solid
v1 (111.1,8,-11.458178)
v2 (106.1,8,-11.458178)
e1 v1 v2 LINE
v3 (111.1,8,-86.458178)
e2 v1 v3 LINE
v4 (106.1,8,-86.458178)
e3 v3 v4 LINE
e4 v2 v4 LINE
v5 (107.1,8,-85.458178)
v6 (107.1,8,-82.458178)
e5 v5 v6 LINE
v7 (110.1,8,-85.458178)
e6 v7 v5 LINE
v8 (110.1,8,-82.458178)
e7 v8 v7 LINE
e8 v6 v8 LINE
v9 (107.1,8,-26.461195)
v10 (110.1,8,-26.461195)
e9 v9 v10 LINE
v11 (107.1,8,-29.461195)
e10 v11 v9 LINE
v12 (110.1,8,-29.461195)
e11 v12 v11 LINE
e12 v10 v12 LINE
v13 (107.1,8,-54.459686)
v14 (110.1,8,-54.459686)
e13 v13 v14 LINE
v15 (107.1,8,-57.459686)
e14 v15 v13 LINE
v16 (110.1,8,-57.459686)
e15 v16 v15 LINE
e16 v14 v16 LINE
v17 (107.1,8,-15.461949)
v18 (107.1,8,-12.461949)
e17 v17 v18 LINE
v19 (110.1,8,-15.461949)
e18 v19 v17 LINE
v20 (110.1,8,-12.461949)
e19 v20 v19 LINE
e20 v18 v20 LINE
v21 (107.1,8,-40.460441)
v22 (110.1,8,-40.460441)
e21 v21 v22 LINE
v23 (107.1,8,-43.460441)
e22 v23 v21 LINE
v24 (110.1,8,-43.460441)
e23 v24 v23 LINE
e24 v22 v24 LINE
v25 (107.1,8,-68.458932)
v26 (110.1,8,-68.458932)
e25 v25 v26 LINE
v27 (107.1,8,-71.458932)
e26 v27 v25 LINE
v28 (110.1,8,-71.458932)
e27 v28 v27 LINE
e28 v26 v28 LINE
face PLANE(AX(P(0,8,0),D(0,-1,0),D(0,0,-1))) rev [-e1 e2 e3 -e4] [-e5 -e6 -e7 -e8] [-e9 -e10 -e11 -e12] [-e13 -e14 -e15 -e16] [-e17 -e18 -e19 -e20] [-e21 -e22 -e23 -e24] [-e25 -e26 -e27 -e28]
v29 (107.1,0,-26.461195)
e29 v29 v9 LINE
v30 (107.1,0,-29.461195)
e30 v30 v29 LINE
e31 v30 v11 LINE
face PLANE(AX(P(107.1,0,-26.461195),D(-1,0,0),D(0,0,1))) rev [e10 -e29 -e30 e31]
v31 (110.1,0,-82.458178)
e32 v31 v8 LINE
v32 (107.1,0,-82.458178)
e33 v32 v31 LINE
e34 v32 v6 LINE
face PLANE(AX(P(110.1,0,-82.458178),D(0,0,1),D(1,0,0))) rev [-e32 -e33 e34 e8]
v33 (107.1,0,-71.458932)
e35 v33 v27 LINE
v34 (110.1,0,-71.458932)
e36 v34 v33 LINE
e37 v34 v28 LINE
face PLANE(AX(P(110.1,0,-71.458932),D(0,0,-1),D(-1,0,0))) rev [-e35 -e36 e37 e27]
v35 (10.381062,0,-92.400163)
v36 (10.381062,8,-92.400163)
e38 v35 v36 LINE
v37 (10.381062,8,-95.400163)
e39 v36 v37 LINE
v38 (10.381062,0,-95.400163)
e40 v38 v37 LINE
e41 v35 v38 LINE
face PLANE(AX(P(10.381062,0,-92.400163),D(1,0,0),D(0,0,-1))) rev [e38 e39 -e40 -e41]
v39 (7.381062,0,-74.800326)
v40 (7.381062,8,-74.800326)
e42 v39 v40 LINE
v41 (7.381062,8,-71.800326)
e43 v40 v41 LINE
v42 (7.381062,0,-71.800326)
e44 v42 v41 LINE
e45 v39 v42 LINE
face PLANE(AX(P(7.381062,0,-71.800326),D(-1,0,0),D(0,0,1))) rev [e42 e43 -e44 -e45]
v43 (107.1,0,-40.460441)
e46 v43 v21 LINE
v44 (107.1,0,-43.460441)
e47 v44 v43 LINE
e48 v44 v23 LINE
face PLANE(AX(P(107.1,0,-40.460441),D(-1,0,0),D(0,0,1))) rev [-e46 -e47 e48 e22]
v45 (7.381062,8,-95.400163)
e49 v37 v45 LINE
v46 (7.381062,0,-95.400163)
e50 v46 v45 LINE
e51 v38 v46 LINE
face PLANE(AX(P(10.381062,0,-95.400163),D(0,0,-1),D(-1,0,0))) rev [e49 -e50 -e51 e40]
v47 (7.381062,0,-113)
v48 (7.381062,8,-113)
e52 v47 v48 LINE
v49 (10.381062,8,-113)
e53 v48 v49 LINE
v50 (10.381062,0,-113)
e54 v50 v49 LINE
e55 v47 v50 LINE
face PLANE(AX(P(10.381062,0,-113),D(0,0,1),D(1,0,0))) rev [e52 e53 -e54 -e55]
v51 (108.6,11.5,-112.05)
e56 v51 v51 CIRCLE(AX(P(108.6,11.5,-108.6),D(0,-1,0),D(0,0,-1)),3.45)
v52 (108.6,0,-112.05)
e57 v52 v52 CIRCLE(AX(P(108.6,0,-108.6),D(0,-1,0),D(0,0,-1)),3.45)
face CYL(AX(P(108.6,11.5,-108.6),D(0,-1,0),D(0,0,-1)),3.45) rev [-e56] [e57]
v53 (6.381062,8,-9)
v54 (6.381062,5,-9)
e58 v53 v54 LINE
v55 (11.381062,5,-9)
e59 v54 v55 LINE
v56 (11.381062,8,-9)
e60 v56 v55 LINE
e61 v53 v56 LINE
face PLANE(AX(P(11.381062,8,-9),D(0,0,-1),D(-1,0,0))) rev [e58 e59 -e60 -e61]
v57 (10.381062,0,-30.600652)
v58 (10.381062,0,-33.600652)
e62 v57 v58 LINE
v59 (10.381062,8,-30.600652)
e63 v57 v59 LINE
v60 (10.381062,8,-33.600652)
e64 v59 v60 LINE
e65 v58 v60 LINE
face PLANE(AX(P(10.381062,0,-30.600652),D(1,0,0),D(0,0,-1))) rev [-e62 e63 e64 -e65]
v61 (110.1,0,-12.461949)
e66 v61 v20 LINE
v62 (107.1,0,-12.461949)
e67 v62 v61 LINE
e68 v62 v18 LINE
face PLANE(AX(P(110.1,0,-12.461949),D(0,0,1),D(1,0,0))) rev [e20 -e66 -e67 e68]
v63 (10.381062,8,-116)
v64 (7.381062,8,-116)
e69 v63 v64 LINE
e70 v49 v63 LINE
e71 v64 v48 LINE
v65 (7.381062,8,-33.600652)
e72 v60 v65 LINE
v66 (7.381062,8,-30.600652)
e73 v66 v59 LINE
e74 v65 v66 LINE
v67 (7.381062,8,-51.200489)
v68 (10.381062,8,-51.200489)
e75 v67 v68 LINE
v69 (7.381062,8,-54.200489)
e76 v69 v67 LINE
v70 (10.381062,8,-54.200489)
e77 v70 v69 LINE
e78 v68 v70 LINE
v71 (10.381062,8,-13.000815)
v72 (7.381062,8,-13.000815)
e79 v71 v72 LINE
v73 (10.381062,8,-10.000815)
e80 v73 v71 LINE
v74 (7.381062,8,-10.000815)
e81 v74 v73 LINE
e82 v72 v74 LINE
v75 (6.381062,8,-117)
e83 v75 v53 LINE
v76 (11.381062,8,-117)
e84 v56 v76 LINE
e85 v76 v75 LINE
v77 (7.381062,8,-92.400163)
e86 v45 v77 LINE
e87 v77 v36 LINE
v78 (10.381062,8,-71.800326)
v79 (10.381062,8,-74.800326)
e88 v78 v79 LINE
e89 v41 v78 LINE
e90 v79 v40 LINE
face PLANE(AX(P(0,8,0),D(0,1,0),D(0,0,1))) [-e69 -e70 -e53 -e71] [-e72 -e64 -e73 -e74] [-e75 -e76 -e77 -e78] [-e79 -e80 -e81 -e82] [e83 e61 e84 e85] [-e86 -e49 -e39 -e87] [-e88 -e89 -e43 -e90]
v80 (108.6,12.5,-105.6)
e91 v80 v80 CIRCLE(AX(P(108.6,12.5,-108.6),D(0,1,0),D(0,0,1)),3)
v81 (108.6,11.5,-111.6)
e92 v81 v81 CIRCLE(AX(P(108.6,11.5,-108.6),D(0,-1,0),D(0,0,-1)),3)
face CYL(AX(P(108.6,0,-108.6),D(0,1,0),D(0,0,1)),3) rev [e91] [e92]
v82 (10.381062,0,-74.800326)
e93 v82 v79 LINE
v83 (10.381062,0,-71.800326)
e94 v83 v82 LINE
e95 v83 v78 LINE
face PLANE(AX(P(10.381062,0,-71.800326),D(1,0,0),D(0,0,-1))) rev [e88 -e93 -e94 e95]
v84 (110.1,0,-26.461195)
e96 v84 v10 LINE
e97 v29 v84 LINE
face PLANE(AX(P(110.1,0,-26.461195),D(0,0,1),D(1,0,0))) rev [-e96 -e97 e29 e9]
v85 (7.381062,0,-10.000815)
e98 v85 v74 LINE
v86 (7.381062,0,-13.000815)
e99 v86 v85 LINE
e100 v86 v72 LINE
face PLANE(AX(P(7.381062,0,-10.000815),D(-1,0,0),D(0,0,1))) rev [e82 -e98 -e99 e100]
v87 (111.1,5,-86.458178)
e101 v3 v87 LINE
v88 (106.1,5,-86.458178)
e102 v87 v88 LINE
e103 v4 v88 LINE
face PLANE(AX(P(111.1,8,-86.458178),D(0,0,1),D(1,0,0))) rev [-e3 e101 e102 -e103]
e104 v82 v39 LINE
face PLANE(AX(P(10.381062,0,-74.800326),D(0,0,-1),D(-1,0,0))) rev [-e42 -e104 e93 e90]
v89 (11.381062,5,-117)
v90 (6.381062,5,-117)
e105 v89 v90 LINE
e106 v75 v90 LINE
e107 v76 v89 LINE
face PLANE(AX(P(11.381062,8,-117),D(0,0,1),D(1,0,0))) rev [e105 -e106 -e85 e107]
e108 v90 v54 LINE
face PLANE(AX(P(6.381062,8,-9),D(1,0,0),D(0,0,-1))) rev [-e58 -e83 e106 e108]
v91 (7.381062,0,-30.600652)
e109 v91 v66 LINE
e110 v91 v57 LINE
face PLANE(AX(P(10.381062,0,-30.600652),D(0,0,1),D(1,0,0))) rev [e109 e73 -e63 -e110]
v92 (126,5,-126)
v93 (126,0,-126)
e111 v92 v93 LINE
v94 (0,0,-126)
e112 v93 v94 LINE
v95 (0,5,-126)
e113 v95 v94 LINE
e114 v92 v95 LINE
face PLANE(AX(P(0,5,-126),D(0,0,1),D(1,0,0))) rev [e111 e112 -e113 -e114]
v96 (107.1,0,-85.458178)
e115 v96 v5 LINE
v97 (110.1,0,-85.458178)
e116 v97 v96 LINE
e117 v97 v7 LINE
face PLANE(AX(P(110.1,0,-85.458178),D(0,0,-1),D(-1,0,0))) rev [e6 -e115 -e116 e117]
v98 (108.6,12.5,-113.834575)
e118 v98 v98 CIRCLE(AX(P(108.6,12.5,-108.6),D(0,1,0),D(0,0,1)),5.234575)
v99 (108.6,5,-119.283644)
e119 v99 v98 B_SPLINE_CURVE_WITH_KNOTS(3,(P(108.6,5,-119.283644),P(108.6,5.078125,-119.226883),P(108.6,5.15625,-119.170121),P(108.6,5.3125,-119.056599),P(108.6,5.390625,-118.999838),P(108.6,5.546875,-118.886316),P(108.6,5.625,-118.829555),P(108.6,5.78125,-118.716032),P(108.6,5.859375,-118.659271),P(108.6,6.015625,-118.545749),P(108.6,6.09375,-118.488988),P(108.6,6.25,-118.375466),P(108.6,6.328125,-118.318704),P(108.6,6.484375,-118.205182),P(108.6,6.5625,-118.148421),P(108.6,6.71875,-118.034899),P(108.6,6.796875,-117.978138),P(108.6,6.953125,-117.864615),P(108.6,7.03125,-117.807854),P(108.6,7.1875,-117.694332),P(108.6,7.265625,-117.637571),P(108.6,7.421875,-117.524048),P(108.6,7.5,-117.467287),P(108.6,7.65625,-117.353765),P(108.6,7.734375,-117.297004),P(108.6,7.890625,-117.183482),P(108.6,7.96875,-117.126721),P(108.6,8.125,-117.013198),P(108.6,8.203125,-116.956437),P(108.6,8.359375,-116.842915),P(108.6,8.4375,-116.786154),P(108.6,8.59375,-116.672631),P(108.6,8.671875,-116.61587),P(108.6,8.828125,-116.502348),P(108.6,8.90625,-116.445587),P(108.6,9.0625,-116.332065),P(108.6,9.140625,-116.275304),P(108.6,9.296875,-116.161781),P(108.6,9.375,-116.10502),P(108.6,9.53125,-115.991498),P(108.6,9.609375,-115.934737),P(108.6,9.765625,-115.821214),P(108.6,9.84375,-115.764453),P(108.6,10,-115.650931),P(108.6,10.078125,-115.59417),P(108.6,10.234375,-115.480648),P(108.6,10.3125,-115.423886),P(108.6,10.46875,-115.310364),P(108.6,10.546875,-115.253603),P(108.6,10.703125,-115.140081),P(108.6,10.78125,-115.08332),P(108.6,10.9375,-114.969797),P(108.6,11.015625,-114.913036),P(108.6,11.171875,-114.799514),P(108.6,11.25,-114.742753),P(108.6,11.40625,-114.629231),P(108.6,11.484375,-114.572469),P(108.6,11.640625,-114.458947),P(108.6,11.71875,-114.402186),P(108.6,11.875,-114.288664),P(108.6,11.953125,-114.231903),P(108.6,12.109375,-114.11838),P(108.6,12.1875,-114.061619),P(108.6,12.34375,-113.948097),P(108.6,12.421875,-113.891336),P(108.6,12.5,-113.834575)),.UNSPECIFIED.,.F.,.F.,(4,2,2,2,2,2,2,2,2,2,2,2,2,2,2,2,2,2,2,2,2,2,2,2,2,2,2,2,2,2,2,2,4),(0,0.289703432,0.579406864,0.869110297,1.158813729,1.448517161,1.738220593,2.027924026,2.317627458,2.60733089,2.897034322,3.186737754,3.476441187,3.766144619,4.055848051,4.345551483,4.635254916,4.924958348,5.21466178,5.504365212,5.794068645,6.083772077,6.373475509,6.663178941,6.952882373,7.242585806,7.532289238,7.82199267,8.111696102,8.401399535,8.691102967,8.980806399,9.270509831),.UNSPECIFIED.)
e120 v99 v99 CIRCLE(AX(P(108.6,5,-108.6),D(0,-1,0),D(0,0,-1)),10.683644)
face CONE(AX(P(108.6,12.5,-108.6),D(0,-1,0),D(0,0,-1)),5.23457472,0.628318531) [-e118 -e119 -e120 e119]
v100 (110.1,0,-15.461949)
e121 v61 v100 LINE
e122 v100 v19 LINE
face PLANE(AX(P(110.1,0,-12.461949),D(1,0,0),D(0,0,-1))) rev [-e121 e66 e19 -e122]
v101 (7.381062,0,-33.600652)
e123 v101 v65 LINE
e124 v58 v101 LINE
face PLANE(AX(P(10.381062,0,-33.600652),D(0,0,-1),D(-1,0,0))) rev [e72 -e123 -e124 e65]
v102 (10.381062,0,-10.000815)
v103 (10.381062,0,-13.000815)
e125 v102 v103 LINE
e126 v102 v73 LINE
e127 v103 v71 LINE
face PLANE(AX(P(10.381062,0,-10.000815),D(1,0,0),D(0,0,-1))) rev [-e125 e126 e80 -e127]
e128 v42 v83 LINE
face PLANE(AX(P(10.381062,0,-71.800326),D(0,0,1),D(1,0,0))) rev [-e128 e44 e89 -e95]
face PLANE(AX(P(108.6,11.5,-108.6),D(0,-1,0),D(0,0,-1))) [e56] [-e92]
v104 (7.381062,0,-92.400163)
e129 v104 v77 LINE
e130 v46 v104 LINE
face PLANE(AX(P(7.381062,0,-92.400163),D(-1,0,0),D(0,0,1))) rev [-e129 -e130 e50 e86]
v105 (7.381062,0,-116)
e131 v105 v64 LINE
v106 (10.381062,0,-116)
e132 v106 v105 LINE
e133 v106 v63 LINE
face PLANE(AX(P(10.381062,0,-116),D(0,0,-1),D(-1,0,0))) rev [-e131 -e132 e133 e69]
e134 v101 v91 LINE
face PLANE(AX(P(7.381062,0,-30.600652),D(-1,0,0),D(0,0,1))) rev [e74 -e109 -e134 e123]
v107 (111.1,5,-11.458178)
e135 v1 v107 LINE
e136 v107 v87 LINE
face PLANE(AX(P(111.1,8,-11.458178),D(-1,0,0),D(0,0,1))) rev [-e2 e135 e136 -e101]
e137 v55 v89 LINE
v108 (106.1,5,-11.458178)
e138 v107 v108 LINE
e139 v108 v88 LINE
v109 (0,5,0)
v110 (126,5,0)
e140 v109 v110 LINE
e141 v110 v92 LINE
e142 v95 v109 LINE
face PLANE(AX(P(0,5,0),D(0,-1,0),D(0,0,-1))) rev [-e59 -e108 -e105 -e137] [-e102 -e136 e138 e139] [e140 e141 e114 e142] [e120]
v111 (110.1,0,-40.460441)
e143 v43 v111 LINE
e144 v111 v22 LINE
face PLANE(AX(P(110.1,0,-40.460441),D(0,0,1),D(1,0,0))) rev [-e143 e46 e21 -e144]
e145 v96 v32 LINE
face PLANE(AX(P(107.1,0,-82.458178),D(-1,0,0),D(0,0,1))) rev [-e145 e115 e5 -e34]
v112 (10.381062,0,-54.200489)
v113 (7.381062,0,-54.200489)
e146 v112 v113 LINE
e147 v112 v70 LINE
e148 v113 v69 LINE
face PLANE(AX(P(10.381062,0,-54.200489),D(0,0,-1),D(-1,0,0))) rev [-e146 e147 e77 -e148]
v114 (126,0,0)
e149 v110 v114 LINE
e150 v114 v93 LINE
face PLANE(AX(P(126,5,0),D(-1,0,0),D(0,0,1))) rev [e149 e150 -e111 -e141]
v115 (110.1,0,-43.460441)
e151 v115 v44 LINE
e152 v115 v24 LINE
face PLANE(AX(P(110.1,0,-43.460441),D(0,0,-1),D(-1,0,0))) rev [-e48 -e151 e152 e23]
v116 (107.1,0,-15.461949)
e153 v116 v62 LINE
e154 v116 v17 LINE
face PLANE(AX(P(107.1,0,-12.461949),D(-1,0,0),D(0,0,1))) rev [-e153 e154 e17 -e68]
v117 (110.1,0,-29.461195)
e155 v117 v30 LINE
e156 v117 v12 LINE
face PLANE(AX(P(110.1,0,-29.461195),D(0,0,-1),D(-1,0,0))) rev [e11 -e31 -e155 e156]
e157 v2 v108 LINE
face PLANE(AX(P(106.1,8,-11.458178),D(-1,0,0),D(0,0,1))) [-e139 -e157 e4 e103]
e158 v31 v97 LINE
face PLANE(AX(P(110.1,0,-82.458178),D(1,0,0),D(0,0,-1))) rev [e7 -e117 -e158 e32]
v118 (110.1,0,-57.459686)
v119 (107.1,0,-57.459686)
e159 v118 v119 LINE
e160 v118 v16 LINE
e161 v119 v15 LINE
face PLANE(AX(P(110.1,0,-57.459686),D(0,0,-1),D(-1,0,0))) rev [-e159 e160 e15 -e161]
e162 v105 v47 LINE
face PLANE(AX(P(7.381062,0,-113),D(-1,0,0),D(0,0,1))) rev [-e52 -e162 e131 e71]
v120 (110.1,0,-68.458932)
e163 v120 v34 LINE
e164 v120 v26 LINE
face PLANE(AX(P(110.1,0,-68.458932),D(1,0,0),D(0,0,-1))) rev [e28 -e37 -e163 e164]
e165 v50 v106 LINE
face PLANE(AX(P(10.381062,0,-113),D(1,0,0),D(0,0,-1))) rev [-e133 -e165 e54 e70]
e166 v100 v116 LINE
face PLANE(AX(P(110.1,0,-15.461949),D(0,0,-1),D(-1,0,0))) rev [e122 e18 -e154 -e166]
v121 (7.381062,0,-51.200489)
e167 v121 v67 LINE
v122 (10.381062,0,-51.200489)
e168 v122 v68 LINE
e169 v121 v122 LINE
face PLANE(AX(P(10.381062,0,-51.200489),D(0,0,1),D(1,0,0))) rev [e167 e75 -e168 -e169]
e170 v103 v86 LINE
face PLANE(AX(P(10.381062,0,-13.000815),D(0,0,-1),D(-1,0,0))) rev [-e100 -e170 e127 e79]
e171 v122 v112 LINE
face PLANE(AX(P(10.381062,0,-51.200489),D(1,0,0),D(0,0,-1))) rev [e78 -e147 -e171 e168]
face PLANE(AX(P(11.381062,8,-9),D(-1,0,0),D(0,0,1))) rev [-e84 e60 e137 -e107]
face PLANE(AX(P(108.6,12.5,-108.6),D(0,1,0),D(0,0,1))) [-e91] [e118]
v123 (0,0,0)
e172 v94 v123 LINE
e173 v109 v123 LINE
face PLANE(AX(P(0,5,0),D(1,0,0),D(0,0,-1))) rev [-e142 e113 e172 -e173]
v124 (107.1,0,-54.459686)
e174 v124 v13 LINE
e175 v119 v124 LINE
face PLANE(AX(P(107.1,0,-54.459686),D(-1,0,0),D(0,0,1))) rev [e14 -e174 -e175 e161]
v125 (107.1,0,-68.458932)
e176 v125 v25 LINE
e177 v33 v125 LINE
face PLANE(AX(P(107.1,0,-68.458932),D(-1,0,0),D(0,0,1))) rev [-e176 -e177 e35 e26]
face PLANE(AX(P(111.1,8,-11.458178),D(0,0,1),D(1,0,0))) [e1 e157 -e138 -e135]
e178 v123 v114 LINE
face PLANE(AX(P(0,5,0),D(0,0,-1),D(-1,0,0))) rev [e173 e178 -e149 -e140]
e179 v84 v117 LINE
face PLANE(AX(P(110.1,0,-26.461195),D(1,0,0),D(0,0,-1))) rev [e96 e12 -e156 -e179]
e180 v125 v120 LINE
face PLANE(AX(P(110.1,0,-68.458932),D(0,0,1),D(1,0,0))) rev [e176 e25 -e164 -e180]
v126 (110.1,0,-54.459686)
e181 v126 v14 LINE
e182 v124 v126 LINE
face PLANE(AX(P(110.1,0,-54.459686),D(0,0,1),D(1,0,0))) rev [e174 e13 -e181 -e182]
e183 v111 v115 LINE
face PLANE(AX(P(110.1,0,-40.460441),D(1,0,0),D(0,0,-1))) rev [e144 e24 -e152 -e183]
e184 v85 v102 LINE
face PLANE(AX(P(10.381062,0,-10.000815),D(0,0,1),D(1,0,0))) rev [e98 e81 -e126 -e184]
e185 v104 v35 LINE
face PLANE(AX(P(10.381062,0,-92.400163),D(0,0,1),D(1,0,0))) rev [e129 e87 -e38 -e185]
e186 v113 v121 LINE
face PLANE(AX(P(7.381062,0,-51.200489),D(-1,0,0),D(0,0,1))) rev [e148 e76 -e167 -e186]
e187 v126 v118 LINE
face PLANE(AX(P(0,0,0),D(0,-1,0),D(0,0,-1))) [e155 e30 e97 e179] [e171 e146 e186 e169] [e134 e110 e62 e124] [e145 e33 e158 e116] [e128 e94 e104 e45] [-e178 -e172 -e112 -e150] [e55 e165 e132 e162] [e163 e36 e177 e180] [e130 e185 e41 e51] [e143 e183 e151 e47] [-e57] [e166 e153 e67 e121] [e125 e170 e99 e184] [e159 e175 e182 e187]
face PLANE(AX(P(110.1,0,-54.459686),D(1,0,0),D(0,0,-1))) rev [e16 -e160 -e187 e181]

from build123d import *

# Parameters (mm, degrees)
SKETCH1_W           = 126
SKETCH1_H           = 126
BOSS_EXTRUDE1_DEPTH = 5
SKETCH3_R           = 12.5
BOSS_EXTRUDE2_DEPTH = 7.5
SKETCH4_R           = 3.45
CUT_EXTRUDE1_DEPTH  = 11.5
SKETCH6_R           = 3
CUT_EXTRUDE2_DEPTH  = 179.628805068
CHAMFER1_SIZE       = 10
CHAMFER1_SIZE_2     = 7.26542528
SKETCH9_W           = 5
SKETCH9_H           = 75
BOSS_EXTRUDE4_DEPTH = 3
SKETCH10_W          = 3
SKETCH10_H          = 3
CUT_EXTRUDE4_DEPTH  = 179.370401132
SKETCH11_W          = 5
SKETCH11_H          = 108
BOSS_EXTRUDE5_DEPTH = 3
SKETCH12_W          = 3
SKETCH12_H          = 3
CUT_EXTRUDE5_DEPTH  = 179.370401132


with BuildPart() as part:
    # Sketch1 → Boss-Extrude1 (new body)
    with BuildSketch(Plane(origin=(0, 0, 0), x_dir=(1, 0, 0), z_dir=(0, 1, 0))):
        with Locations((63, 63)):
            Rectangle(SKETCH1_W, SKETCH1_H)
    extrude(amount=BOSS_EXTRUDE1_DEPTH)

    # Sketch3 → Boss-Extrude2 (add)
    with BuildSketch(Plane(origin=(0, 5, 0), x_dir=(1, 0, 0), z_dir=(0, 1, 0))):
        with Locations(Location((108.6, 108.6, 0), (0, 0, 90))):
            Circle(SKETCH3_R)
    extrude(amount=BOSS_EXTRUDE2_DEPTH)

    # Sketch4 → Cut-Extrude1 (cut)
    with BuildSketch(Plane.XZ):
        with Locations(Location((108.6, -108.6, 0), (0, 0, 270))):
            Circle(SKETCH4_R)
    extrude(amount=-CUT_EXTRUDE1_DEPTH, mode=Mode.SUBTRACT)

    # Sketch6 → Cut-Extrude2 (cut, through all)
    with BuildSketch(Plane(origin=(0, 12.5, 0), x_dir=(1, 0, 0), z_dir=(0, 1, 0))):
        with Locations(Location((108.6, 108.6, 0), (0, 0, 270))):
            Circle(SKETCH6_R)
    extrude(amount=-CUT_EXTRUDE2_DEPTH, mode=Mode.SUBTRACT)

    # Chamfer1
    # the kernel refuses this chamfer: 10, 7.26542528 mm, written as the material it takes off along each edge
    with BuildSketch(Plane(origin=(108.6, 12.5, -108.6), x_dir=(0, 0, -1), z_dir=(1, 0, 0))) as chamfer1_piece_1_section:
        Polygon((12.5, -CHAMFER1_SIZE), (12.5 - CHAMFER1_SIZE_2, 0), (12.5, 0), align=None)
    chamfer1_piece_1 = revolve(axis=Axis((108.6, 12.5, -108.6), (0, 1, 0)), mode=Mode.PRIVATE)
    chamfer1_piece_1 = split(chamfer1_piece_1, bisect_by=Plane(origin=(108.6, 5, -100.650989912), z_dir=(0, 1, 0)), keep=Keep.TOP, mode=Mode.PRIVATE)
    add(chamfer1_piece_1, mode=Mode.SUBTRACT)

    # Sketch9 → Boss-Extrude4 (add)
    with BuildSketch(Plane(origin=(0, 5, 0), x_dir=(1, 0, 0), z_dir=(0, 1, 0))):
        with Locations((108.6, 48.95817816)):
            Rectangle(SKETCH9_W, SKETCH9_H)
    extrude(amount=BOSS_EXTRUDE4_DEPTH)

    # Sketch10 → Cut-Extrude4 (cut, through all)
    with BuildSketch(Plane(origin=(0, 8, 0), x_dir=(1, 0, 0), z_dir=(0, 1, 0))):
        with Locations((108.6, 83.95817816)):
            Rectangle(SKETCH10_W, SKETCH10_H)
        with Locations((108.6, 69.958932274)):
            Rectangle(SKETCH10_W, SKETCH10_H)
        with Locations((108.6, 55.959686388)):
            Rectangle(SKETCH10_W, SKETCH10_H)
        with Locations((108.6, 41.960440502)):
            Rectangle(SKETCH10_W, SKETCH10_H)
        with Locations((108.6, 27.961194616)):
            Rectangle(SKETCH10_W, SKETCH10_H)
        with Locations((108.6, 13.96194873)):
            Rectangle(SKETCH10_W, SKETCH10_H)
    extrude(amount=-CUT_EXTRUDE4_DEPTH, mode=Mode.SUBTRACT)

    # Sketch11 → Boss-Extrude5 (add)
    with BuildSketch(Plane(origin=(0, 5, 0), x_dir=(1, 0, 0), z_dir=(0, 1, 0))):
        with Locations((8.881061813, 63)):
            Rectangle(SKETCH11_W, SKETCH11_H)
    extrude(amount=BOSS_EXTRUDE5_DEPTH)

    # Sketch12 → Cut-Extrude5 (cut, through all)
    with BuildSketch(Plane(origin=(0, 8, 0), x_dir=(1, 0, 0), z_dir=(0, 1, 0))):
        with Locations((8.881061813, 114.5)):
            Rectangle(SKETCH12_W, SKETCH12_H)
        with Locations((8.881061813, 93.900163021)):
            Rectangle(SKETCH12_W, SKETCH12_H)
        with Locations((8.881061813, 73.300326041)):
            Rectangle(SKETCH12_W, SKETCH12_H)
        with Locations((8.881061813, 52.700489062)):
            Rectangle(SKETCH12_W, SKETCH12_H)
        with Locations((8.881061813, 32.100652082)):
            Rectangle(SKETCH12_W, SKETCH12_H)
        with Locations((8.881061813, 11.500815103)):
            Rectangle(SKETCH12_W, SKETCH12_H)
    extrude(amount=-CUT_EXTRUDE5_DEPTH, mode=Mode.SUBTRACT)


solid = part.part
